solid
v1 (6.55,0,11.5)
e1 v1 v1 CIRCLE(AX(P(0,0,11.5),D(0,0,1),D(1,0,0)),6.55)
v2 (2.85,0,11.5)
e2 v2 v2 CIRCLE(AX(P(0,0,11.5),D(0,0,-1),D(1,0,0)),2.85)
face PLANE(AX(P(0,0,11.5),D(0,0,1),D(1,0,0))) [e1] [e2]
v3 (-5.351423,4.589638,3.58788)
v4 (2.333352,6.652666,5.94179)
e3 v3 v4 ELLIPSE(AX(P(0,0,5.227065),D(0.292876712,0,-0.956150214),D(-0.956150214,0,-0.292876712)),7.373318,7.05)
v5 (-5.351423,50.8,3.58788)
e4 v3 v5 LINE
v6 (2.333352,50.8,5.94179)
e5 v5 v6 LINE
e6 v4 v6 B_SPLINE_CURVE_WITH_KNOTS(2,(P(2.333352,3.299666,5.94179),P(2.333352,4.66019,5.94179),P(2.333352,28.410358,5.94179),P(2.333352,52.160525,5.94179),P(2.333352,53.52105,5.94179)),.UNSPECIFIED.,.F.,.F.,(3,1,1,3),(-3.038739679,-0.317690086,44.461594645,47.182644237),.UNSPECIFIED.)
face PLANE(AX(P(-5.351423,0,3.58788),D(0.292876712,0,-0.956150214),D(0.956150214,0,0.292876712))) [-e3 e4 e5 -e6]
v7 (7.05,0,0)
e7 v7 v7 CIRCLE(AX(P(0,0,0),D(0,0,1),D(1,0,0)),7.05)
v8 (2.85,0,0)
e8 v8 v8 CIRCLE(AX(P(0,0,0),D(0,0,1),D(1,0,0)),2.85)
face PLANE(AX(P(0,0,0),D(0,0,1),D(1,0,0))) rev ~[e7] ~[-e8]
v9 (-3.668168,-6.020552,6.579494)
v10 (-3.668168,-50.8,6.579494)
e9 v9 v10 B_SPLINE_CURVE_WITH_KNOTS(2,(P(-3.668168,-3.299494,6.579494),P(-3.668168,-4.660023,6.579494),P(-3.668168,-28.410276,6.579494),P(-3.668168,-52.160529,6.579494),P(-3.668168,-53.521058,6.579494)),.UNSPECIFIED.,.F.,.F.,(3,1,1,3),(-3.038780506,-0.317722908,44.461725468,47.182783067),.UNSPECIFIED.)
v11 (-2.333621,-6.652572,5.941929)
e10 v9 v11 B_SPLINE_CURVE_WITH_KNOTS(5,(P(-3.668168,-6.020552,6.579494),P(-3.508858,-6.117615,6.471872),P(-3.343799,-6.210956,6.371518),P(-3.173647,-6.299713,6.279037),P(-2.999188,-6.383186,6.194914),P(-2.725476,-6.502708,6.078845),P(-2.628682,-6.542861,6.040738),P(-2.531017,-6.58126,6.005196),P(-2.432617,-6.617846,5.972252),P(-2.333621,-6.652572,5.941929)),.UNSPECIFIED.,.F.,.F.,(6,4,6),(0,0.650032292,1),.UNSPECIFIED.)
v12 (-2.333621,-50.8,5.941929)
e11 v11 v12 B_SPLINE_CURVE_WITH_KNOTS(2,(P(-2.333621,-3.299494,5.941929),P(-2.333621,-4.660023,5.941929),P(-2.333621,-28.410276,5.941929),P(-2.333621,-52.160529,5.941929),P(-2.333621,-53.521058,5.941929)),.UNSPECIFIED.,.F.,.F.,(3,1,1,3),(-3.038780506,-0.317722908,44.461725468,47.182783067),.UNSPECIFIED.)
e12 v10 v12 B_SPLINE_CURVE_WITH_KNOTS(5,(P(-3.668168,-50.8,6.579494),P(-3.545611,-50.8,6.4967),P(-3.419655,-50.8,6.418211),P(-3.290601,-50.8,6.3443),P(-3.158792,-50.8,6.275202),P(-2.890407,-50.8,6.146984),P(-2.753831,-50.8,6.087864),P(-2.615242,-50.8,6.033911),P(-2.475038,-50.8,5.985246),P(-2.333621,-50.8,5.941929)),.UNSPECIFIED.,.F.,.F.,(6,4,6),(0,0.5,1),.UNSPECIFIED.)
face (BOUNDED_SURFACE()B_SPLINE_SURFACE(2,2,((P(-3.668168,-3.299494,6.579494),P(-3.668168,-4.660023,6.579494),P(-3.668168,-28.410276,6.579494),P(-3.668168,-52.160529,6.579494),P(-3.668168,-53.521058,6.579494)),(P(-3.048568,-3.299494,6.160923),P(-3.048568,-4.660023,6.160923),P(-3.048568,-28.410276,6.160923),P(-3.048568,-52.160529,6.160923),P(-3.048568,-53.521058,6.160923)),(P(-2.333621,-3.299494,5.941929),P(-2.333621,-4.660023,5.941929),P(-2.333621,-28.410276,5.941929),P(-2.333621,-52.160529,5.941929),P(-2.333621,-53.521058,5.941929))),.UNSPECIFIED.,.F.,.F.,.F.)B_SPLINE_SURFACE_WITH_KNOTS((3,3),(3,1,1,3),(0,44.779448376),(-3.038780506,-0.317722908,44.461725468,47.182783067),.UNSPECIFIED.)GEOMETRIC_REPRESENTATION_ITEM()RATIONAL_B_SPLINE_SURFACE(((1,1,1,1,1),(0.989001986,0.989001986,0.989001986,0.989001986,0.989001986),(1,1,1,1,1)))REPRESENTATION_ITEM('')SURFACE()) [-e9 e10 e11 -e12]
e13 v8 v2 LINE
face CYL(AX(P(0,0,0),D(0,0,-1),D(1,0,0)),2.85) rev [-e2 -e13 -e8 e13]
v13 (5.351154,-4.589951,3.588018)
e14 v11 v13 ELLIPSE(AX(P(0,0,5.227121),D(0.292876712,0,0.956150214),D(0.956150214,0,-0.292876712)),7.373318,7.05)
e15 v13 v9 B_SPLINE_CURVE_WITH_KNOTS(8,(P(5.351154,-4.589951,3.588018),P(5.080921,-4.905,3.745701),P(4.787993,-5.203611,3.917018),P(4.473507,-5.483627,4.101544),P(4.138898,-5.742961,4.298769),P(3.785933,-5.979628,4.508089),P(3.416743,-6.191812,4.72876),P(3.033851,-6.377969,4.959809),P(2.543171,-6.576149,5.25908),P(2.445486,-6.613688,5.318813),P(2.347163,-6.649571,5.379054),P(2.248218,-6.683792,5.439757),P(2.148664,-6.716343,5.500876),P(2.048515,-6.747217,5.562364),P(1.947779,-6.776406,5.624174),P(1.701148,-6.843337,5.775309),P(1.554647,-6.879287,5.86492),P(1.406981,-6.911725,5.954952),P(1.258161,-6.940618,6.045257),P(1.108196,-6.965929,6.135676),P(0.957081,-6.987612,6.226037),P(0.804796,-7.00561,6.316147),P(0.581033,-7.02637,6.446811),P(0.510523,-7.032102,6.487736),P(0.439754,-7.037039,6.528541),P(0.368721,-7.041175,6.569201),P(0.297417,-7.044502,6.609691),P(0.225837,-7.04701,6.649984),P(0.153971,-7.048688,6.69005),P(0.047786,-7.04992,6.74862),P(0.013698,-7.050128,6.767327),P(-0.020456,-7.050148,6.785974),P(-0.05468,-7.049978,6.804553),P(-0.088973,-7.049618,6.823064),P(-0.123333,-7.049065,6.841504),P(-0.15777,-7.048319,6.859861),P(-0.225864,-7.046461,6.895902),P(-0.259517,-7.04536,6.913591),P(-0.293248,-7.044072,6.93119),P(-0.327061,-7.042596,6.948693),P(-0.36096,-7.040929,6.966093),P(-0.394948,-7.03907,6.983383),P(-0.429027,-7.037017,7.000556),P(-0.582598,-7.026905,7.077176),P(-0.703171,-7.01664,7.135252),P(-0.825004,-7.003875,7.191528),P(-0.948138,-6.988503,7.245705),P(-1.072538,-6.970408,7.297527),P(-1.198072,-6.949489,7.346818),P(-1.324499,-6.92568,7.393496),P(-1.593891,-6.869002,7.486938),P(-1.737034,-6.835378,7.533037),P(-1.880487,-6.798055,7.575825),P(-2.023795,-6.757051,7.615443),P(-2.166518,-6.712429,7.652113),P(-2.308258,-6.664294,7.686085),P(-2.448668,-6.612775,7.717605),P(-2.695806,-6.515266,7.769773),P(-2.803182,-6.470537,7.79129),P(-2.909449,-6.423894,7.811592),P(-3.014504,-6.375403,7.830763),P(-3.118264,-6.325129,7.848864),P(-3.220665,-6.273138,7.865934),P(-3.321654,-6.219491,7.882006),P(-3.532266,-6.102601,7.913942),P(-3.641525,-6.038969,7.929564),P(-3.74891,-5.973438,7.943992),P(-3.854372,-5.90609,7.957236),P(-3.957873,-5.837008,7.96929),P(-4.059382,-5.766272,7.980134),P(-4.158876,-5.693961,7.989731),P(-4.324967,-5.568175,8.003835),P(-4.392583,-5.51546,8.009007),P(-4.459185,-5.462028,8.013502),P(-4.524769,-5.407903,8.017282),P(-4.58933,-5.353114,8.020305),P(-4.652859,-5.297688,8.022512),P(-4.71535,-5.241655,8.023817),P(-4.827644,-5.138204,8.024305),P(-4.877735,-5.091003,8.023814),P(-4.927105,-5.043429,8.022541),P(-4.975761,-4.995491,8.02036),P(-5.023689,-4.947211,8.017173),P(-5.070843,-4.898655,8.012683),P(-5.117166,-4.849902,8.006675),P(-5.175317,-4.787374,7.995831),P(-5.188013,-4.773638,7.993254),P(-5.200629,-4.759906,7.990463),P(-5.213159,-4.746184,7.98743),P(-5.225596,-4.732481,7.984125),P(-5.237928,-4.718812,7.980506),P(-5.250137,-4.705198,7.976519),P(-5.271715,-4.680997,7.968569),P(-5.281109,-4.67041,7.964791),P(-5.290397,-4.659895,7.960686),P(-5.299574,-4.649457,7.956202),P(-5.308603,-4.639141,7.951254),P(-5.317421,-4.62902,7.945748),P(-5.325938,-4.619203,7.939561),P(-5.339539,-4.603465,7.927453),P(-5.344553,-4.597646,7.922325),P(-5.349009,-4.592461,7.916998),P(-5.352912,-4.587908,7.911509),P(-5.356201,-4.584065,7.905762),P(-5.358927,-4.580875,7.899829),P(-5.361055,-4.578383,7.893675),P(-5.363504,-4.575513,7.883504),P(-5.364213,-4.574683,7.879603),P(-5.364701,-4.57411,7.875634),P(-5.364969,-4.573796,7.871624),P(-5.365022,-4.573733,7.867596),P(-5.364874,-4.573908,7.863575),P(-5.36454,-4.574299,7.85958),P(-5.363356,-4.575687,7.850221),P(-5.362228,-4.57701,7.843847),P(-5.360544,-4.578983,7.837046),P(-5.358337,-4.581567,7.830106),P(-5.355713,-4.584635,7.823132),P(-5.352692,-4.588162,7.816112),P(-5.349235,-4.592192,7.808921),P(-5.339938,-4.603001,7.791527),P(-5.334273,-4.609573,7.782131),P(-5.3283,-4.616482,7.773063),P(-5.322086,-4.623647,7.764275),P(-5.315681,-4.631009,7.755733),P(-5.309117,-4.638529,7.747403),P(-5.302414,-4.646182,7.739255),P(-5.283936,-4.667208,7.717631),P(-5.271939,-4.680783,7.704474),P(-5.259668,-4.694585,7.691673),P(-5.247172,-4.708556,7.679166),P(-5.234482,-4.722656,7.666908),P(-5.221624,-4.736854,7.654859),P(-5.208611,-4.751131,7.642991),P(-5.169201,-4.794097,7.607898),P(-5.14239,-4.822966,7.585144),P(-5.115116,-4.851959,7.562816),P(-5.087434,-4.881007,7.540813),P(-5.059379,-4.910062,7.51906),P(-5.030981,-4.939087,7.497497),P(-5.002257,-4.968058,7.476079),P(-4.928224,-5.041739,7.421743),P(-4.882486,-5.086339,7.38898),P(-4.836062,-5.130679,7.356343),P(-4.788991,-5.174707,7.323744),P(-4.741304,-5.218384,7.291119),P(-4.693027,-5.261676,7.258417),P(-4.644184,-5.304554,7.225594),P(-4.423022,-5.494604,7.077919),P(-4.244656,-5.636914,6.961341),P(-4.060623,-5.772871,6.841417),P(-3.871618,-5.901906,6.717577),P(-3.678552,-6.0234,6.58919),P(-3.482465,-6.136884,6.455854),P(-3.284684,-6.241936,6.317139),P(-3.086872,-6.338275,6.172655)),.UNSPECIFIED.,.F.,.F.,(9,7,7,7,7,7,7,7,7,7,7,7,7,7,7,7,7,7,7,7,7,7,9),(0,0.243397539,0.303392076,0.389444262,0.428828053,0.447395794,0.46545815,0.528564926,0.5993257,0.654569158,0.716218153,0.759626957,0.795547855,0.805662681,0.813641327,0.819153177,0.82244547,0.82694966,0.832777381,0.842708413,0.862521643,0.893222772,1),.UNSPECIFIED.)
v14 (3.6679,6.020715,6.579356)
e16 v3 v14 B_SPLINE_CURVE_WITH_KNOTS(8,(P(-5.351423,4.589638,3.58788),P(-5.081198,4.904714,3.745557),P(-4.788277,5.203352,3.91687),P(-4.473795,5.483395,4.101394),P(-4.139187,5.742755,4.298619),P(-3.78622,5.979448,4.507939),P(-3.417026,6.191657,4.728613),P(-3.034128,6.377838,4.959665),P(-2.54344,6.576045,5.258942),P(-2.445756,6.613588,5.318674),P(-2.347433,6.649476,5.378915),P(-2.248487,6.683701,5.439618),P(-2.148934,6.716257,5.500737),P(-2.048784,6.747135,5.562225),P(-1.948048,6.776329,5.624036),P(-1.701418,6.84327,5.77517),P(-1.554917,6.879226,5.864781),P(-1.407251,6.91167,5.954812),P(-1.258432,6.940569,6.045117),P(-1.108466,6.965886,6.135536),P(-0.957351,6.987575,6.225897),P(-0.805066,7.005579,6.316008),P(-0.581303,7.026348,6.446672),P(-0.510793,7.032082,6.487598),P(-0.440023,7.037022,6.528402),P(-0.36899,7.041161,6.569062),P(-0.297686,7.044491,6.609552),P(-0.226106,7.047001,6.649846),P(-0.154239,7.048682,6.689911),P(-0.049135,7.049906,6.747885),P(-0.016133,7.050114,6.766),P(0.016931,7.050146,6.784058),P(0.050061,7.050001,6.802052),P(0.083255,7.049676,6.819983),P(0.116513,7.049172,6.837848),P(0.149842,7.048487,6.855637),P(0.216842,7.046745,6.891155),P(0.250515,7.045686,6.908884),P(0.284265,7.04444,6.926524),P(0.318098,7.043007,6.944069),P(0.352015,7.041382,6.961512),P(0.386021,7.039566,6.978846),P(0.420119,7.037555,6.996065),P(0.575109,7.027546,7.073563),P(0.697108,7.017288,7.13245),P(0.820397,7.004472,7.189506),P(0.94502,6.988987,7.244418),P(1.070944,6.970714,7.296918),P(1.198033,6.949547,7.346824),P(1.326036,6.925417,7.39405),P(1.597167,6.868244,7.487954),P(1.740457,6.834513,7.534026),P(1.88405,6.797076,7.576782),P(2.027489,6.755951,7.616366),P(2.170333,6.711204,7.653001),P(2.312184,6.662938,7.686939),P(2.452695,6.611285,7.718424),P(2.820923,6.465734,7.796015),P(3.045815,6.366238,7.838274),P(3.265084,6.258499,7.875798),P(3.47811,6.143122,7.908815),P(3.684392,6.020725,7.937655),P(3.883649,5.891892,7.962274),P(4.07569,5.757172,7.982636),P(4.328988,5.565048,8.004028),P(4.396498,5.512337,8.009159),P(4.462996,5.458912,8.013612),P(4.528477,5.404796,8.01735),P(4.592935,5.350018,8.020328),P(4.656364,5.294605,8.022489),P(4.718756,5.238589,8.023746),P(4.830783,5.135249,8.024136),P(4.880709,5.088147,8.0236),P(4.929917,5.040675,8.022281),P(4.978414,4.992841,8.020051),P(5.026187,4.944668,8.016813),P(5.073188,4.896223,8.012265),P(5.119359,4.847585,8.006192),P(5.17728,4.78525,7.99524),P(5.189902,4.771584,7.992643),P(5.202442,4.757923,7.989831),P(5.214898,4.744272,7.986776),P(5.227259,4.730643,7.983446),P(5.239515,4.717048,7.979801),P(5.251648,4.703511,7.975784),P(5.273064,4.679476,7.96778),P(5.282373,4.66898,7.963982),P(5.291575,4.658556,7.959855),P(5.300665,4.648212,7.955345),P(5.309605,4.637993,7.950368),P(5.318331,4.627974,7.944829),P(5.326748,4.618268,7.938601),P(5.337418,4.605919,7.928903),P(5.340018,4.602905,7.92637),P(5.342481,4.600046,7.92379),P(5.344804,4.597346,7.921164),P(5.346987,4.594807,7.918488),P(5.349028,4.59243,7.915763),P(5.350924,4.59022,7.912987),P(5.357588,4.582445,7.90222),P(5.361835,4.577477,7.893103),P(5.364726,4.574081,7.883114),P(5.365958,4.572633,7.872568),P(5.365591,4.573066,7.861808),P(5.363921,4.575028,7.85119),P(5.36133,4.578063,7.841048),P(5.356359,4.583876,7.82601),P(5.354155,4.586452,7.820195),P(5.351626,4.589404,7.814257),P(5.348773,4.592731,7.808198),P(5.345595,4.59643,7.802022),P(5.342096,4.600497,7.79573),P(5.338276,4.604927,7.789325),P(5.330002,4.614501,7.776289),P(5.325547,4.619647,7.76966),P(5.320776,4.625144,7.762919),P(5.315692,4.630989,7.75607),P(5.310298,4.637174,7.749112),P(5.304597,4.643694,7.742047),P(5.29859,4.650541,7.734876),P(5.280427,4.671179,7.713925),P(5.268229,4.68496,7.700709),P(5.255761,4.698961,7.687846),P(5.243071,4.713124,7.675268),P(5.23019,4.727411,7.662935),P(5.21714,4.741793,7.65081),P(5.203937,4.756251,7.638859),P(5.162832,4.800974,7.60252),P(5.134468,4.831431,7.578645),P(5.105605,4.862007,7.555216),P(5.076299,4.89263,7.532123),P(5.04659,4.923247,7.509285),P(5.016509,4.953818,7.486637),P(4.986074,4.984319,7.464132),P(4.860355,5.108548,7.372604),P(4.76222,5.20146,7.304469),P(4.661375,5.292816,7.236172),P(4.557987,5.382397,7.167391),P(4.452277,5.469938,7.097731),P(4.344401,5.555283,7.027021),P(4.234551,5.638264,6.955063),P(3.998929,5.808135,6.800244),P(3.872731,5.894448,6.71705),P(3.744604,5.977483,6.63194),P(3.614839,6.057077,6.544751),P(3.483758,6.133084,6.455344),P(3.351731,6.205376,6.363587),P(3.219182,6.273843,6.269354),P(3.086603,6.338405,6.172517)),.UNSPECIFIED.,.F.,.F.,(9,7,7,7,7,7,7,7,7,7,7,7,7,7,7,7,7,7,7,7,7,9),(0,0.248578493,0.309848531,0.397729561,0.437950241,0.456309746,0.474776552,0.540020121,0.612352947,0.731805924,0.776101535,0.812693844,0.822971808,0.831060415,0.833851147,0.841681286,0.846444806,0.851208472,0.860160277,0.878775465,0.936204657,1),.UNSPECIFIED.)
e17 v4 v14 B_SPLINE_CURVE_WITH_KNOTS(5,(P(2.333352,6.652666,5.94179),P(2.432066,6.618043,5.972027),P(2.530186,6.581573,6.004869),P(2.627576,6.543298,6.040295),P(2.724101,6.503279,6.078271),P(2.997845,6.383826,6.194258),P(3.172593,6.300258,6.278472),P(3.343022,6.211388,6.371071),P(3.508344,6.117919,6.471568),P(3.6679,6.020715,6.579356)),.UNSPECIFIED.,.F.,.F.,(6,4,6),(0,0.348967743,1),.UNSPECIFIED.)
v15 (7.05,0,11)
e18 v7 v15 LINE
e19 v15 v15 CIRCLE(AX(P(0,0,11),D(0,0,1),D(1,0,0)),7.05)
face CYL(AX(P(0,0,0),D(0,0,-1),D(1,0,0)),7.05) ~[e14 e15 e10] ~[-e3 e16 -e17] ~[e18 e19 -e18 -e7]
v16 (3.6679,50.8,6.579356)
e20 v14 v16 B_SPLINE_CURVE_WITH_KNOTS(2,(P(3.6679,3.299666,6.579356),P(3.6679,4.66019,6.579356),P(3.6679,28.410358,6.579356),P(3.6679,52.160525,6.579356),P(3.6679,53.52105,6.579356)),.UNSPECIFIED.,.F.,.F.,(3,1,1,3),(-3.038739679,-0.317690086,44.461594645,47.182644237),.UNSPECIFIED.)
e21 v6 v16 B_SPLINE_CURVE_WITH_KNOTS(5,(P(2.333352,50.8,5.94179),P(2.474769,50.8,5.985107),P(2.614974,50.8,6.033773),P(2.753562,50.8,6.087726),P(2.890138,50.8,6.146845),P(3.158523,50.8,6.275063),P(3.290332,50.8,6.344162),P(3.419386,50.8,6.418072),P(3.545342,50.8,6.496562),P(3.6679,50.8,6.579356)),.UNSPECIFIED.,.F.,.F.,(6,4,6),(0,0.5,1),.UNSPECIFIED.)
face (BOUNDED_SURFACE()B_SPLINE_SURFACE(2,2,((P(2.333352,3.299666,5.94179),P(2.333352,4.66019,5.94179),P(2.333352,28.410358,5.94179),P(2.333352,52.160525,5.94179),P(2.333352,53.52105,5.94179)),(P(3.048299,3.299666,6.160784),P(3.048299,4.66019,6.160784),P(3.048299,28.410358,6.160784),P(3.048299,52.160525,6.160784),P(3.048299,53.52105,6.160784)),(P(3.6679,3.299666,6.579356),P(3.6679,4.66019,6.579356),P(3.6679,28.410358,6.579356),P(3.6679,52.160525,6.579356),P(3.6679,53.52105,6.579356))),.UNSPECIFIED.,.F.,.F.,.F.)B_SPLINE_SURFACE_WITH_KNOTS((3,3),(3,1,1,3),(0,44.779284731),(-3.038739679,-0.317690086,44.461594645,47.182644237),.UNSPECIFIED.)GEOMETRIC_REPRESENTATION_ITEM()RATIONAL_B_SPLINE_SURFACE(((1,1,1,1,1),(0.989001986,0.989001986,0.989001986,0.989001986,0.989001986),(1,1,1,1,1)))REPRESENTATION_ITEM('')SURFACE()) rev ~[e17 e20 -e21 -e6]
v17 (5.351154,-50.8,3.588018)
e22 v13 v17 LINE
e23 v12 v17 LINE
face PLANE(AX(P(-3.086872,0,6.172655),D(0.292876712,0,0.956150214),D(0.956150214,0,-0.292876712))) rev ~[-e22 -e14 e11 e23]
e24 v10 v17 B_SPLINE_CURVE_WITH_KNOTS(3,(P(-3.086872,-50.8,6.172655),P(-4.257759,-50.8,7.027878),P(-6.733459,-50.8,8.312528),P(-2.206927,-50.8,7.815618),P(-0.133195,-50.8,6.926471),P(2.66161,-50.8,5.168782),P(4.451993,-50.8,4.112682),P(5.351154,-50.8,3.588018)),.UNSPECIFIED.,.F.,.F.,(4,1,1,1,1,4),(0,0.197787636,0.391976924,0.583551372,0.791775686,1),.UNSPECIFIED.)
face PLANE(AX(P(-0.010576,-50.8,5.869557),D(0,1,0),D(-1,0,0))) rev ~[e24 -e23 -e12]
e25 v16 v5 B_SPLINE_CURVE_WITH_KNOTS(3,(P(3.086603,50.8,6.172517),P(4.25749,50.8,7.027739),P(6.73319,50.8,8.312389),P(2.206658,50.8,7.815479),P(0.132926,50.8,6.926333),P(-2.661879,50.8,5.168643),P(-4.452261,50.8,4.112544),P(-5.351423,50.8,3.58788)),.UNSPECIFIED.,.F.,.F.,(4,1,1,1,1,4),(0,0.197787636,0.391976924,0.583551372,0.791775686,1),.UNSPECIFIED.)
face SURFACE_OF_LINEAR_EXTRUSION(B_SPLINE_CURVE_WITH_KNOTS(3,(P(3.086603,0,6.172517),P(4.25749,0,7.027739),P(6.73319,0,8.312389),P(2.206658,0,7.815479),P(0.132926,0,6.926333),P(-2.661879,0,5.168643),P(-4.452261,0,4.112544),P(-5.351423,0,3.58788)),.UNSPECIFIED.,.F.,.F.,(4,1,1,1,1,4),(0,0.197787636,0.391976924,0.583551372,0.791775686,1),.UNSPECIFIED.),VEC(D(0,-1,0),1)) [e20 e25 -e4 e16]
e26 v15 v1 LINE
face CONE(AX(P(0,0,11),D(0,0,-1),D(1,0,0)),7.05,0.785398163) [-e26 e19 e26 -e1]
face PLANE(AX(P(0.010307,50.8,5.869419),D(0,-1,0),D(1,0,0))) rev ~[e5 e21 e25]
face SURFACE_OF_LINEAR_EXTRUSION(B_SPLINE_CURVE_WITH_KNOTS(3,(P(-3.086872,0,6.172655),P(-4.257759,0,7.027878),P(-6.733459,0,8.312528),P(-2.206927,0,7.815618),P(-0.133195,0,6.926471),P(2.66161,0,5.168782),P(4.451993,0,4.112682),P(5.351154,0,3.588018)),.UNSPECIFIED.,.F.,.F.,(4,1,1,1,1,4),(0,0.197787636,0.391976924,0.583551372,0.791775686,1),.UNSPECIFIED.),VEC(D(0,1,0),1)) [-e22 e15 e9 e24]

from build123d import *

# Parameters (mm, degrees)
F0_R     = 7.05
F0_R_2   = 2.85
F1_DEPTH = 11.5
F3_DEPTH = 50.8
F4_R     = 5
F6_DEPTH = 50.8
F7_R     = 5
F8_DEPTH = 25
F9_SIZE  = 0.5


# Not quite as in the source:
# - a feature names something its author has since deleted; it is built from what else it names


with BuildPart() as f1:
    # F0 (on Top) → F1 (new body)
    with BuildSketch(Plane.XY):
        Circle(F0_R)
        Circle(F0_R_2, mode=Mode.SUBTRACT)
        Circle(F0_R_2)
    extrude(amount=F1_DEPTH)

    # F2 (on Front) → F3 (join)
    with BuildSketch(Plane.XZ):
        with BuildLine():
            add(Edge.make_bspline(
                [(-3.0868715491, 6.1726554698), (-4.257758818, 7.0278775794), (-6.7334588292, 8.3125277988), (-2.2069270317, 7.8156179057), (-0.1331950402, 6.9264711716), (2.6616102749, 5.1687815765), (4.451992816, 4.1126824333), (5.3511540891, 3.588018488)],
                knots=[0, 0, 0, 0, 0.1977876363, 0.3919769243, 0.5835513721, 0.7917756861, 1, 1, 1, 1], degree=3))
            Line((-3.0868715491, 6.1726554698), (5.3511540891, 3.588018488))
        make_face()
    extrude(amount=F3_DEPTH)

    # F4
    f4_edges = [f1.edges().sort_by_distance(p)[0] for p in [
        (-3.086872, -28.569137, 6.172655),
    ]]
    fillet(f4_edges, radius=F4_R)

    # F5 (on Front) → F6 (join)
    with BuildSketch(Plane.XZ):
        with BuildLine():
            Line((-5.3514227233, 3.587880028), (3.086602915, 6.1725170098))
            add(Edge.make_bspline(
                [(3.086602915, 6.1725170098), (4.2574901838, 7.0277391194), (6.733190195, 8.3123893387), (2.2066583976, 7.8154794457), (0.1329264061, 6.9263327116), (-2.661878909, 5.1686431165), (-4.4522614501, 4.1125439733), (-5.3514227233, 3.587880028)],
                knots=[0, 0, 0, 0, 0.1977876363, 0.3919769243, 0.5835513721, 0.7917756861, 1, 1, 1, 1], degree=3))
        make_face()
    extrude(amount=-F6_DEPTH)

    # F7
    f7_edges = [f1.edges().sort_by_distance(p)[0] for p in [
        (3.086603, 28.569203, 6.172517),
    ]]
    fillet(f7_edges, radius=F7_R)

    # F0 (on Top) → F8 (cut)
    with BuildSketch(Plane.XY):
        Circle(F0_R_2)
    extrude(amount=F8_DEPTH, mode=Mode.SUBTRACT)

    # F9
    f9_edges = [f1.edges().sort_by_distance(p)[0] for p in [
        (-7.05, 0, 11.5),
    ]]
    chamfer(f9_edges, length=F9_SIZE)


solid = f1.part
